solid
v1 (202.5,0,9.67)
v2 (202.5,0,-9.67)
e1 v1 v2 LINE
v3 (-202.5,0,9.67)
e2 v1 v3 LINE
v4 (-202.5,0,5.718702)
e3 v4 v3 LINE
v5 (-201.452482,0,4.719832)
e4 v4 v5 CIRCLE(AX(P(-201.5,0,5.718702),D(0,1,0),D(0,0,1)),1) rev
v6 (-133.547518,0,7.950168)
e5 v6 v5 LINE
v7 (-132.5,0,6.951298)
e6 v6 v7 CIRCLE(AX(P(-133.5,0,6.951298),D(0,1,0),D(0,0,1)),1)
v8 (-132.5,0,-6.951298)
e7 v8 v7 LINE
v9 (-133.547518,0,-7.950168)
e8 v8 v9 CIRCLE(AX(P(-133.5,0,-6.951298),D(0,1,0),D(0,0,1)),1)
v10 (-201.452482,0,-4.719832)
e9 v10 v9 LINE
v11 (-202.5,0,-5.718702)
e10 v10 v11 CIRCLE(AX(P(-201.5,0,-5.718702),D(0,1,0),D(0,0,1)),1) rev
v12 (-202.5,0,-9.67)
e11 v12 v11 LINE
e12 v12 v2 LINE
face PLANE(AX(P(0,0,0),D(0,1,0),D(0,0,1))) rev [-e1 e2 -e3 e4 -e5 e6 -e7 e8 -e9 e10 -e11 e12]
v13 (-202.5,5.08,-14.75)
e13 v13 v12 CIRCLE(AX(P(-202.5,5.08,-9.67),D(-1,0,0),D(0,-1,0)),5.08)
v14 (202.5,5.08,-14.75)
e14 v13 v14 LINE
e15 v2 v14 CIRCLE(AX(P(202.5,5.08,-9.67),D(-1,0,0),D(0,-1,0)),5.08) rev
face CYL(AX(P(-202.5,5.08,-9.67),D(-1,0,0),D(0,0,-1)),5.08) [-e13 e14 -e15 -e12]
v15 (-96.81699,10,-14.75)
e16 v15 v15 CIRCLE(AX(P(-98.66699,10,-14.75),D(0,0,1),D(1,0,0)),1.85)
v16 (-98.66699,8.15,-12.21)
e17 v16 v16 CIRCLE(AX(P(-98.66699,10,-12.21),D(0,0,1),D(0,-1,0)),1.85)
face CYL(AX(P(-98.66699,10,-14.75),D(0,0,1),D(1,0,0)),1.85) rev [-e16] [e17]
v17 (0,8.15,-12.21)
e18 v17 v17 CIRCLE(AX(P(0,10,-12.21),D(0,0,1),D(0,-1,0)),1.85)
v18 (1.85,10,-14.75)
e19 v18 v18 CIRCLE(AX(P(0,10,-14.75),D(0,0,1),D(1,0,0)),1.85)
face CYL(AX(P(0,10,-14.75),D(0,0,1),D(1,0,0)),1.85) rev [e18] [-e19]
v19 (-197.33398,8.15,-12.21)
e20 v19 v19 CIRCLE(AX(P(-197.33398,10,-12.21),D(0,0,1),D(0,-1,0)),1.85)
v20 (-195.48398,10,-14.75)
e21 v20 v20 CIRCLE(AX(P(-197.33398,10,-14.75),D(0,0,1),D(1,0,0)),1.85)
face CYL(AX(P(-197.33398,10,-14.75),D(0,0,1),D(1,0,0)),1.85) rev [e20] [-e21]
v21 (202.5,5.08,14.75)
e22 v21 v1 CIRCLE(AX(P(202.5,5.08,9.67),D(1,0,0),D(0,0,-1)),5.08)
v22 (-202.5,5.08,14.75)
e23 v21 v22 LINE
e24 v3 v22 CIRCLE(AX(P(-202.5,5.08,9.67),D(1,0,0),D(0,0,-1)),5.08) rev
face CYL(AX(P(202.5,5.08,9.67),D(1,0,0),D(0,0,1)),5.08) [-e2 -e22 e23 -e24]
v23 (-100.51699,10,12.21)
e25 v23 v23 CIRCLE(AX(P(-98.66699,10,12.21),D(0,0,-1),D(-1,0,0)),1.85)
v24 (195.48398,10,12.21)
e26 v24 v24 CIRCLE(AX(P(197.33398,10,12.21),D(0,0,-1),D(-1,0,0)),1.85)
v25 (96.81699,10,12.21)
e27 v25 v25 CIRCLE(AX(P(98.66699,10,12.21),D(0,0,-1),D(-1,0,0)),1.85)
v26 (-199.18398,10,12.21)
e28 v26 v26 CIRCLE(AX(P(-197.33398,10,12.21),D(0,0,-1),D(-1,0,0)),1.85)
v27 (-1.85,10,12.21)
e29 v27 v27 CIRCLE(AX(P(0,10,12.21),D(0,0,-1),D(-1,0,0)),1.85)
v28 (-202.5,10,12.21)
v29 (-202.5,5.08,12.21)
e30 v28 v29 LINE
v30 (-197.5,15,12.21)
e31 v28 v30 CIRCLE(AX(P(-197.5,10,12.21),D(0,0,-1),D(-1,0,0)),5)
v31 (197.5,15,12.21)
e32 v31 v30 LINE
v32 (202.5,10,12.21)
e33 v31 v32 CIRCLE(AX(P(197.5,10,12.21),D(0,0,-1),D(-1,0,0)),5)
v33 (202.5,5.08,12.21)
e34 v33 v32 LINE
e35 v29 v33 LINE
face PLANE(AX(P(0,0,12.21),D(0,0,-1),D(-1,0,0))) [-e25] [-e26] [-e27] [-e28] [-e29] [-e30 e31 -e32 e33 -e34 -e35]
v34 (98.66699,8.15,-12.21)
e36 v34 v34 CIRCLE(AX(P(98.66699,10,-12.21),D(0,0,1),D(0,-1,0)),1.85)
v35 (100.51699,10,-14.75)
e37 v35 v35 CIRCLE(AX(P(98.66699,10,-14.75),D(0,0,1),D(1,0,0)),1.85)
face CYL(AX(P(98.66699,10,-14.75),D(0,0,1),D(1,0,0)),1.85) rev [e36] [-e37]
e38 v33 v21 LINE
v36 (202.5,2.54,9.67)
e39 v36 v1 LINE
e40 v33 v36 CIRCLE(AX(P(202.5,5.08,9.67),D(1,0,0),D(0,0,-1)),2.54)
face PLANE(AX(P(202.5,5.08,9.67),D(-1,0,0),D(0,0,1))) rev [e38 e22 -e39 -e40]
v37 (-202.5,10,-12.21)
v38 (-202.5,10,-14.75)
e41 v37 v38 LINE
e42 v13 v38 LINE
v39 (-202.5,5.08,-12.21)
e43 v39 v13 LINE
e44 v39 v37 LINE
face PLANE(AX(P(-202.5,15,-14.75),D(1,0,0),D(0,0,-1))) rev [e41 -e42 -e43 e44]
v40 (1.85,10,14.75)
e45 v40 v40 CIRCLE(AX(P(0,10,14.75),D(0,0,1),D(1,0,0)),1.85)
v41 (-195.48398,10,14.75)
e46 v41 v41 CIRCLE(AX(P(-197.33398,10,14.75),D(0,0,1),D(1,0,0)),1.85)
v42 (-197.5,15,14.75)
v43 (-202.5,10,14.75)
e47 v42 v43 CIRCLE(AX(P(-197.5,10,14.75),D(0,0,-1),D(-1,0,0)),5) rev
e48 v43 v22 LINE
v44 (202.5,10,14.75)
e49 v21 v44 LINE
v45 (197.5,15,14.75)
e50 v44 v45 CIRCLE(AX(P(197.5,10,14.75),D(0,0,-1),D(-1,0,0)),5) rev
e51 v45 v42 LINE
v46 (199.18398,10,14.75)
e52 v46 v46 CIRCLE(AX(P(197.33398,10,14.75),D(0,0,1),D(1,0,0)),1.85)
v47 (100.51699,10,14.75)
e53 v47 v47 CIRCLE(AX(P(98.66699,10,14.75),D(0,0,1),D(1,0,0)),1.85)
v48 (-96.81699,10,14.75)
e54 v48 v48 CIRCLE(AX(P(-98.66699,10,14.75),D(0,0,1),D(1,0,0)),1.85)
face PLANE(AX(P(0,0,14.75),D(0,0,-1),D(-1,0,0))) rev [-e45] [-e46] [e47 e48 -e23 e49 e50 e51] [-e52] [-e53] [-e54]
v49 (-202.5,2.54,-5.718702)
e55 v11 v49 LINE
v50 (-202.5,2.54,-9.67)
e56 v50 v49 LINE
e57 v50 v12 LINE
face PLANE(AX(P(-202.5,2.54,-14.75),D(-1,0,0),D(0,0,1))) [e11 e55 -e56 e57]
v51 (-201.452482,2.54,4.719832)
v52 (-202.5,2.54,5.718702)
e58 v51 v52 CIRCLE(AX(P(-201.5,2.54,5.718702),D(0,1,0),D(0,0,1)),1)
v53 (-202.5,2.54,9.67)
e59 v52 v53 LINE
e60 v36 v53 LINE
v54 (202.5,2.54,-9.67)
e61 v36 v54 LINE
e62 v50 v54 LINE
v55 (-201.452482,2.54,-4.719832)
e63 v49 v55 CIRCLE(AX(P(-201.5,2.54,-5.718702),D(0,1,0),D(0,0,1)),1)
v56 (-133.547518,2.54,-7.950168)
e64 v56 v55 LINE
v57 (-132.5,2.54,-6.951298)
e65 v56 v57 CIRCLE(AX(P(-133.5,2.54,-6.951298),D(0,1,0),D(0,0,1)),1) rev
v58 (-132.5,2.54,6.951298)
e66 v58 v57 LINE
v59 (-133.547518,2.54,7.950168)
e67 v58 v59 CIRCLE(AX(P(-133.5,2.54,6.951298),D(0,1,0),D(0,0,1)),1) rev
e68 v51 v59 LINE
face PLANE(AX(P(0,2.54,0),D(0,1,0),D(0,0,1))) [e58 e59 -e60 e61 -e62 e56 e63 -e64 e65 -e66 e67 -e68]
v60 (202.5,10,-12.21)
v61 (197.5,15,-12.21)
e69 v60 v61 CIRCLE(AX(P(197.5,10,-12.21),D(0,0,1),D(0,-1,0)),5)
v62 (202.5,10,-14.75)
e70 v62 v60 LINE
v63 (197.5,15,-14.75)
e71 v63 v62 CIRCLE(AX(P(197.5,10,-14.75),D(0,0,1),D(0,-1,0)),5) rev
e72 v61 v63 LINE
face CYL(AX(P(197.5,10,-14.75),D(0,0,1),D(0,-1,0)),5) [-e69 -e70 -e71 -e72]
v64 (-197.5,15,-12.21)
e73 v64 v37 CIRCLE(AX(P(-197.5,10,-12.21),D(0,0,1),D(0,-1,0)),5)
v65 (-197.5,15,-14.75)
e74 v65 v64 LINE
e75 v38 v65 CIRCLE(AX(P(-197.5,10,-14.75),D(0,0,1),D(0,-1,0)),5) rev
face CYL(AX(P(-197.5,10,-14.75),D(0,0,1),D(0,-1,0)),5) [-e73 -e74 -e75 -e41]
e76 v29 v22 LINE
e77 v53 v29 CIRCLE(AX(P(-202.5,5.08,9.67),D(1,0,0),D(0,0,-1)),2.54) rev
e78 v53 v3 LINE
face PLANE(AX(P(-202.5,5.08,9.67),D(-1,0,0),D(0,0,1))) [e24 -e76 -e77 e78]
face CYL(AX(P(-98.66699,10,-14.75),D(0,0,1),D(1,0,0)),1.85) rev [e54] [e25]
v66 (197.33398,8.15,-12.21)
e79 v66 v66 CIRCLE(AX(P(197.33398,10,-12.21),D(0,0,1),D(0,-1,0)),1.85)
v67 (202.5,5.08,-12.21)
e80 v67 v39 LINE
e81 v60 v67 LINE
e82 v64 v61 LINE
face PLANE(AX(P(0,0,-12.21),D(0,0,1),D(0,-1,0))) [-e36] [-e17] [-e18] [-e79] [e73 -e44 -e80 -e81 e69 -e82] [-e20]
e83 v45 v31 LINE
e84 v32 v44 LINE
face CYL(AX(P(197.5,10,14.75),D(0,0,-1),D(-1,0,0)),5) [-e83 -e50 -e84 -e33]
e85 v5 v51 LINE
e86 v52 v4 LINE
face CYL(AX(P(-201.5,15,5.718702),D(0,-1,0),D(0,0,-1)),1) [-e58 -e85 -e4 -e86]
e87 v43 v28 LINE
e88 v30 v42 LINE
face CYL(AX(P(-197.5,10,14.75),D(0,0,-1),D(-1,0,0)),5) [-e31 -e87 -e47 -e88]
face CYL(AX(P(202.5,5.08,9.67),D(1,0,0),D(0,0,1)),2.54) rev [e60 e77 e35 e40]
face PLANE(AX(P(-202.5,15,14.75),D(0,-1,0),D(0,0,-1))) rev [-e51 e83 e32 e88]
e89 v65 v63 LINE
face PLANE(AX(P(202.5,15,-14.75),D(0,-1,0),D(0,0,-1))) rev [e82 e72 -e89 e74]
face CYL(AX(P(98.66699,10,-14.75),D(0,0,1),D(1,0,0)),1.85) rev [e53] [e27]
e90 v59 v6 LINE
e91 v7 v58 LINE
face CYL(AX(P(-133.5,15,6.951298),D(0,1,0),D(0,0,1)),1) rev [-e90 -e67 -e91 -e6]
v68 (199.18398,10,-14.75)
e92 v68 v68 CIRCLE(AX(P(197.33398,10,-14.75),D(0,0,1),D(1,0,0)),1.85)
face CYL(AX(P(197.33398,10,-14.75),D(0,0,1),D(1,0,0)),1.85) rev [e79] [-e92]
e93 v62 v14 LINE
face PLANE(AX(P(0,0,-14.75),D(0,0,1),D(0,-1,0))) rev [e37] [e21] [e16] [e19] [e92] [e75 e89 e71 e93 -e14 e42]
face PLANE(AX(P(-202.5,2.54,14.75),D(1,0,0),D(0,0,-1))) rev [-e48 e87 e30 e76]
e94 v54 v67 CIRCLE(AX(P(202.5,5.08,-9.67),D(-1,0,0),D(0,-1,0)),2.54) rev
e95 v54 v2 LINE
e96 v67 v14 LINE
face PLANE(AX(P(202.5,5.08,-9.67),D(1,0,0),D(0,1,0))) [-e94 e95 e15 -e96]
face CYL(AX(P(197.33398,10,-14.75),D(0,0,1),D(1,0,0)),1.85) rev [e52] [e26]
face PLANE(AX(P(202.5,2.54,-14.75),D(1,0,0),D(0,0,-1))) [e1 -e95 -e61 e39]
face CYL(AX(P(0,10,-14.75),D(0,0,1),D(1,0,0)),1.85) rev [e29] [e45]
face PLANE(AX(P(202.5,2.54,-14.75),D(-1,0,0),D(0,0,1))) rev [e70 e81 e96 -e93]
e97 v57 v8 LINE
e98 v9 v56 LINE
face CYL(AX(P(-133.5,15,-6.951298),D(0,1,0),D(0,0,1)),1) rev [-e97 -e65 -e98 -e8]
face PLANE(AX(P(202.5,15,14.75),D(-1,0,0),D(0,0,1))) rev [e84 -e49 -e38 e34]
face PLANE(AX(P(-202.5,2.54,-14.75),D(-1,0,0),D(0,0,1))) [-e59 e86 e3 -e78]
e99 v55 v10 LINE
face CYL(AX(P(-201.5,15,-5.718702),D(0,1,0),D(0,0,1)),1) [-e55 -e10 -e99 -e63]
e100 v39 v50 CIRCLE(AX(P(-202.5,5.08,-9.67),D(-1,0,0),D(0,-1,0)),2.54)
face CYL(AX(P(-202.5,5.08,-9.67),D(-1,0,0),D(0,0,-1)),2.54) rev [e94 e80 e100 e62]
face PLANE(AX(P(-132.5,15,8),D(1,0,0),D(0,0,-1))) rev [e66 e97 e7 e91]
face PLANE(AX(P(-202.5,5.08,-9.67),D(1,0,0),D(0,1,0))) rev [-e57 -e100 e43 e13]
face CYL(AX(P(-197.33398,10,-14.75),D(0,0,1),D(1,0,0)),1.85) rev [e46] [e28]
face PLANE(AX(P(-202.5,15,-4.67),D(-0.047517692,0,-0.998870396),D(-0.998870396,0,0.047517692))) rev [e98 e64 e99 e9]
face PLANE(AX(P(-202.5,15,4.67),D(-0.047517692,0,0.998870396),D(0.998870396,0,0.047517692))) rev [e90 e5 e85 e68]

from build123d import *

# Parameters (mm, degrees)
SKETCH1_W                      = 405
SKETCH1_H                      = 29.5
BOSS_EXTRUDE1_DEPTH            = 2.54
EDGE_FLANGE1_STRIP_W           = 15.24
EDGE_FLANGE1_STRIP_H           = 2.54
EDGE_FLANGE1_STRIP_CUT_DEPTH   = 405
EDGE_FLANGE1_STRIP_2_W         = 15.24
EDGE_FLANGE1_STRIP_2_H         = 2.54
EDGE_FLANGE1_STRIP_CUT_2_DEPTH = 405
EDGE_FLANGE1_DEPTH             = 405
EDGE_FLANGE1_BEND_DEPTH        = 405
SKETCH17_R                     = 1.85
CUT_EXTRUDE1_DEPTH             = 206.186500531
CUT_EXTRUDE2_DEPTH             = 204.589814333
FILLET1_R                      = 1
FILLET2_R                      = 5


# Sheet-metal steps are written as plain solids
with BuildPart() as part:
    # Sketch1 → Boss-Extrude1 (new body)
    with BuildSketch(Plane(origin=(0, 0, 0), x_dir=(1, 0, 0), z_dir=(0, 1, 0))):
        Rectangle(SKETCH1_W, SKETCH1_H)
    extrude(amount=BOSS_EXTRUDE1_DEPTH)

    # Edge-Flange1 strip (across the edge) → Edge-Flange1 strip cut (cut)
    with BuildSketch(Plane(origin=(202.5, 2.54, -14.75), x_dir=(0, 0, 1), z_dir=(-1, 0, 0))):
        with Locations((-2.54, -1.27)):
            Rectangle(EDGE_FLANGE1_STRIP_W, EDGE_FLANGE1_STRIP_H)
    extrude(amount=EDGE_FLANGE1_STRIP_CUT_DEPTH, mode=Mode.SUBTRACT)

    # Edge-Flange1 strip 2 (across the edge) → Edge-Flange1 strip cut 2 (cut)
    with BuildSketch(Plane(origin=(-202.5, 2.54, 14.75), x_dir=(0, 0, -1), z_dir=(1, 0, 0))):
        with Locations((-2.54, -1.27)):
            Rectangle(EDGE_FLANGE1_STRIP_2_W, EDGE_FLANGE1_STRIP_2_H)
    extrude(amount=EDGE_FLANGE1_STRIP_CUT_2_DEPTH, mode=Mode.SUBTRACT)

    # Edge-Flange1 section (across the edge) → Edge-Flange1 (add)
    with BuildSketch(Plane(origin=(202.5, 2.54, -14.75), x_dir=(0, 0, 1), z_dir=(-1, 0, 0))):
        with BuildLine():
            Line((0, 2.54), (0, 12.46))
            Line((0, 12.46), (2.54, 12.46))
            Line((2.54, 12.46), (2.54, 2.54))
            ThreePointArc((2.54, 2.54), (3.283948776, 0.743948776), (5.08, 0))
            Line((5.08, 0), (5.08, -2.54))
            ThreePointArc((5.08, -2.54), (1.487897552, -1.052102448), (0, 2.54))
        make_face()
    extrude(amount=EDGE_FLANGE1_DEPTH)

    # Edge-Flange1 section 2 (across the edge) → Edge-Flange1 bend (add)
    with BuildSketch(Plane(origin=(-202.5, 2.54, 14.75), x_dir=(0, 0, -1), z_dir=(1, 0, 0))):
        with BuildLine():
            Line((0, 2.54), (0, 12.46))
            Line((0, 12.46), (2.54, 12.46))
            Line((2.54, 12.46), (2.54, 2.54))
            ThreePointArc((2.54, 2.54), (3.283948776, 0.743948776), (5.08, 0))
            Line((5.08, 0), (5.08, -2.54))
            ThreePointArc((5.08, -2.54), (1.487897552, -1.052102448), (0, 2.54))
        make_face()
    extrude(amount=EDGE_FLANGE1_BEND_DEPTH)

    # Sketch17 → Cut-Extrude1 (cut, through all)
    with BuildSketch(Plane.XY.offset(14.75)):
        with Locations((-197.33398, 10)):
            Circle(SKETCH17_R)
        with Locations((-98.66699, 10)):
            Circle(SKETCH17_R)
        with Locations((0, 10)):
            Circle(SKETCH17_R)
        with Locations((98.66699, 10)):
            Circle(SKETCH17_R)
        with Locations((197.33398, 10)):
            Circle(SKETCH17_R)
    extrude(amount=-CUT_EXTRUDE1_DEPTH, mode=Mode.SUBTRACT)

    # Sketch18 → Cut-Extrude2 (cut, through all)
    with BuildSketch(Plane.XZ):
        Polygon((-202.5, -4.67), (-132.5, -8), (-132.5, 8), (-202.5, 4.67), align=None)
    extrude(amount=-CUT_EXTRUDE2_DEPTH, mode=Mode.SUBTRACT)

    # Fillet1
    fillet1_edges = [part.edges().sort_by_distance(p)[0] for p in [
        (-202.5, 1.27, -4.67),
        (-202.5, 1.27, 4.67),
        (-132.5, 1.27, 8),
        (-132.5, 1.27, -8),
    ]]
    fillet(fillet1_edges, radius=FILLET1_R)

    # Fillet2
    fillet2_edges = [part.edges().sort_by_distance(p)[0] for p in [
        (202.5, 15, -13.48),
        (-202.5, 15, -13.48),
        (-202.5, 15, 13.48),
        (202.5, 15, 13.48),
    ]]
    fillet(fillet2_edges, radius=FILLET2_R)


solid = part.part
